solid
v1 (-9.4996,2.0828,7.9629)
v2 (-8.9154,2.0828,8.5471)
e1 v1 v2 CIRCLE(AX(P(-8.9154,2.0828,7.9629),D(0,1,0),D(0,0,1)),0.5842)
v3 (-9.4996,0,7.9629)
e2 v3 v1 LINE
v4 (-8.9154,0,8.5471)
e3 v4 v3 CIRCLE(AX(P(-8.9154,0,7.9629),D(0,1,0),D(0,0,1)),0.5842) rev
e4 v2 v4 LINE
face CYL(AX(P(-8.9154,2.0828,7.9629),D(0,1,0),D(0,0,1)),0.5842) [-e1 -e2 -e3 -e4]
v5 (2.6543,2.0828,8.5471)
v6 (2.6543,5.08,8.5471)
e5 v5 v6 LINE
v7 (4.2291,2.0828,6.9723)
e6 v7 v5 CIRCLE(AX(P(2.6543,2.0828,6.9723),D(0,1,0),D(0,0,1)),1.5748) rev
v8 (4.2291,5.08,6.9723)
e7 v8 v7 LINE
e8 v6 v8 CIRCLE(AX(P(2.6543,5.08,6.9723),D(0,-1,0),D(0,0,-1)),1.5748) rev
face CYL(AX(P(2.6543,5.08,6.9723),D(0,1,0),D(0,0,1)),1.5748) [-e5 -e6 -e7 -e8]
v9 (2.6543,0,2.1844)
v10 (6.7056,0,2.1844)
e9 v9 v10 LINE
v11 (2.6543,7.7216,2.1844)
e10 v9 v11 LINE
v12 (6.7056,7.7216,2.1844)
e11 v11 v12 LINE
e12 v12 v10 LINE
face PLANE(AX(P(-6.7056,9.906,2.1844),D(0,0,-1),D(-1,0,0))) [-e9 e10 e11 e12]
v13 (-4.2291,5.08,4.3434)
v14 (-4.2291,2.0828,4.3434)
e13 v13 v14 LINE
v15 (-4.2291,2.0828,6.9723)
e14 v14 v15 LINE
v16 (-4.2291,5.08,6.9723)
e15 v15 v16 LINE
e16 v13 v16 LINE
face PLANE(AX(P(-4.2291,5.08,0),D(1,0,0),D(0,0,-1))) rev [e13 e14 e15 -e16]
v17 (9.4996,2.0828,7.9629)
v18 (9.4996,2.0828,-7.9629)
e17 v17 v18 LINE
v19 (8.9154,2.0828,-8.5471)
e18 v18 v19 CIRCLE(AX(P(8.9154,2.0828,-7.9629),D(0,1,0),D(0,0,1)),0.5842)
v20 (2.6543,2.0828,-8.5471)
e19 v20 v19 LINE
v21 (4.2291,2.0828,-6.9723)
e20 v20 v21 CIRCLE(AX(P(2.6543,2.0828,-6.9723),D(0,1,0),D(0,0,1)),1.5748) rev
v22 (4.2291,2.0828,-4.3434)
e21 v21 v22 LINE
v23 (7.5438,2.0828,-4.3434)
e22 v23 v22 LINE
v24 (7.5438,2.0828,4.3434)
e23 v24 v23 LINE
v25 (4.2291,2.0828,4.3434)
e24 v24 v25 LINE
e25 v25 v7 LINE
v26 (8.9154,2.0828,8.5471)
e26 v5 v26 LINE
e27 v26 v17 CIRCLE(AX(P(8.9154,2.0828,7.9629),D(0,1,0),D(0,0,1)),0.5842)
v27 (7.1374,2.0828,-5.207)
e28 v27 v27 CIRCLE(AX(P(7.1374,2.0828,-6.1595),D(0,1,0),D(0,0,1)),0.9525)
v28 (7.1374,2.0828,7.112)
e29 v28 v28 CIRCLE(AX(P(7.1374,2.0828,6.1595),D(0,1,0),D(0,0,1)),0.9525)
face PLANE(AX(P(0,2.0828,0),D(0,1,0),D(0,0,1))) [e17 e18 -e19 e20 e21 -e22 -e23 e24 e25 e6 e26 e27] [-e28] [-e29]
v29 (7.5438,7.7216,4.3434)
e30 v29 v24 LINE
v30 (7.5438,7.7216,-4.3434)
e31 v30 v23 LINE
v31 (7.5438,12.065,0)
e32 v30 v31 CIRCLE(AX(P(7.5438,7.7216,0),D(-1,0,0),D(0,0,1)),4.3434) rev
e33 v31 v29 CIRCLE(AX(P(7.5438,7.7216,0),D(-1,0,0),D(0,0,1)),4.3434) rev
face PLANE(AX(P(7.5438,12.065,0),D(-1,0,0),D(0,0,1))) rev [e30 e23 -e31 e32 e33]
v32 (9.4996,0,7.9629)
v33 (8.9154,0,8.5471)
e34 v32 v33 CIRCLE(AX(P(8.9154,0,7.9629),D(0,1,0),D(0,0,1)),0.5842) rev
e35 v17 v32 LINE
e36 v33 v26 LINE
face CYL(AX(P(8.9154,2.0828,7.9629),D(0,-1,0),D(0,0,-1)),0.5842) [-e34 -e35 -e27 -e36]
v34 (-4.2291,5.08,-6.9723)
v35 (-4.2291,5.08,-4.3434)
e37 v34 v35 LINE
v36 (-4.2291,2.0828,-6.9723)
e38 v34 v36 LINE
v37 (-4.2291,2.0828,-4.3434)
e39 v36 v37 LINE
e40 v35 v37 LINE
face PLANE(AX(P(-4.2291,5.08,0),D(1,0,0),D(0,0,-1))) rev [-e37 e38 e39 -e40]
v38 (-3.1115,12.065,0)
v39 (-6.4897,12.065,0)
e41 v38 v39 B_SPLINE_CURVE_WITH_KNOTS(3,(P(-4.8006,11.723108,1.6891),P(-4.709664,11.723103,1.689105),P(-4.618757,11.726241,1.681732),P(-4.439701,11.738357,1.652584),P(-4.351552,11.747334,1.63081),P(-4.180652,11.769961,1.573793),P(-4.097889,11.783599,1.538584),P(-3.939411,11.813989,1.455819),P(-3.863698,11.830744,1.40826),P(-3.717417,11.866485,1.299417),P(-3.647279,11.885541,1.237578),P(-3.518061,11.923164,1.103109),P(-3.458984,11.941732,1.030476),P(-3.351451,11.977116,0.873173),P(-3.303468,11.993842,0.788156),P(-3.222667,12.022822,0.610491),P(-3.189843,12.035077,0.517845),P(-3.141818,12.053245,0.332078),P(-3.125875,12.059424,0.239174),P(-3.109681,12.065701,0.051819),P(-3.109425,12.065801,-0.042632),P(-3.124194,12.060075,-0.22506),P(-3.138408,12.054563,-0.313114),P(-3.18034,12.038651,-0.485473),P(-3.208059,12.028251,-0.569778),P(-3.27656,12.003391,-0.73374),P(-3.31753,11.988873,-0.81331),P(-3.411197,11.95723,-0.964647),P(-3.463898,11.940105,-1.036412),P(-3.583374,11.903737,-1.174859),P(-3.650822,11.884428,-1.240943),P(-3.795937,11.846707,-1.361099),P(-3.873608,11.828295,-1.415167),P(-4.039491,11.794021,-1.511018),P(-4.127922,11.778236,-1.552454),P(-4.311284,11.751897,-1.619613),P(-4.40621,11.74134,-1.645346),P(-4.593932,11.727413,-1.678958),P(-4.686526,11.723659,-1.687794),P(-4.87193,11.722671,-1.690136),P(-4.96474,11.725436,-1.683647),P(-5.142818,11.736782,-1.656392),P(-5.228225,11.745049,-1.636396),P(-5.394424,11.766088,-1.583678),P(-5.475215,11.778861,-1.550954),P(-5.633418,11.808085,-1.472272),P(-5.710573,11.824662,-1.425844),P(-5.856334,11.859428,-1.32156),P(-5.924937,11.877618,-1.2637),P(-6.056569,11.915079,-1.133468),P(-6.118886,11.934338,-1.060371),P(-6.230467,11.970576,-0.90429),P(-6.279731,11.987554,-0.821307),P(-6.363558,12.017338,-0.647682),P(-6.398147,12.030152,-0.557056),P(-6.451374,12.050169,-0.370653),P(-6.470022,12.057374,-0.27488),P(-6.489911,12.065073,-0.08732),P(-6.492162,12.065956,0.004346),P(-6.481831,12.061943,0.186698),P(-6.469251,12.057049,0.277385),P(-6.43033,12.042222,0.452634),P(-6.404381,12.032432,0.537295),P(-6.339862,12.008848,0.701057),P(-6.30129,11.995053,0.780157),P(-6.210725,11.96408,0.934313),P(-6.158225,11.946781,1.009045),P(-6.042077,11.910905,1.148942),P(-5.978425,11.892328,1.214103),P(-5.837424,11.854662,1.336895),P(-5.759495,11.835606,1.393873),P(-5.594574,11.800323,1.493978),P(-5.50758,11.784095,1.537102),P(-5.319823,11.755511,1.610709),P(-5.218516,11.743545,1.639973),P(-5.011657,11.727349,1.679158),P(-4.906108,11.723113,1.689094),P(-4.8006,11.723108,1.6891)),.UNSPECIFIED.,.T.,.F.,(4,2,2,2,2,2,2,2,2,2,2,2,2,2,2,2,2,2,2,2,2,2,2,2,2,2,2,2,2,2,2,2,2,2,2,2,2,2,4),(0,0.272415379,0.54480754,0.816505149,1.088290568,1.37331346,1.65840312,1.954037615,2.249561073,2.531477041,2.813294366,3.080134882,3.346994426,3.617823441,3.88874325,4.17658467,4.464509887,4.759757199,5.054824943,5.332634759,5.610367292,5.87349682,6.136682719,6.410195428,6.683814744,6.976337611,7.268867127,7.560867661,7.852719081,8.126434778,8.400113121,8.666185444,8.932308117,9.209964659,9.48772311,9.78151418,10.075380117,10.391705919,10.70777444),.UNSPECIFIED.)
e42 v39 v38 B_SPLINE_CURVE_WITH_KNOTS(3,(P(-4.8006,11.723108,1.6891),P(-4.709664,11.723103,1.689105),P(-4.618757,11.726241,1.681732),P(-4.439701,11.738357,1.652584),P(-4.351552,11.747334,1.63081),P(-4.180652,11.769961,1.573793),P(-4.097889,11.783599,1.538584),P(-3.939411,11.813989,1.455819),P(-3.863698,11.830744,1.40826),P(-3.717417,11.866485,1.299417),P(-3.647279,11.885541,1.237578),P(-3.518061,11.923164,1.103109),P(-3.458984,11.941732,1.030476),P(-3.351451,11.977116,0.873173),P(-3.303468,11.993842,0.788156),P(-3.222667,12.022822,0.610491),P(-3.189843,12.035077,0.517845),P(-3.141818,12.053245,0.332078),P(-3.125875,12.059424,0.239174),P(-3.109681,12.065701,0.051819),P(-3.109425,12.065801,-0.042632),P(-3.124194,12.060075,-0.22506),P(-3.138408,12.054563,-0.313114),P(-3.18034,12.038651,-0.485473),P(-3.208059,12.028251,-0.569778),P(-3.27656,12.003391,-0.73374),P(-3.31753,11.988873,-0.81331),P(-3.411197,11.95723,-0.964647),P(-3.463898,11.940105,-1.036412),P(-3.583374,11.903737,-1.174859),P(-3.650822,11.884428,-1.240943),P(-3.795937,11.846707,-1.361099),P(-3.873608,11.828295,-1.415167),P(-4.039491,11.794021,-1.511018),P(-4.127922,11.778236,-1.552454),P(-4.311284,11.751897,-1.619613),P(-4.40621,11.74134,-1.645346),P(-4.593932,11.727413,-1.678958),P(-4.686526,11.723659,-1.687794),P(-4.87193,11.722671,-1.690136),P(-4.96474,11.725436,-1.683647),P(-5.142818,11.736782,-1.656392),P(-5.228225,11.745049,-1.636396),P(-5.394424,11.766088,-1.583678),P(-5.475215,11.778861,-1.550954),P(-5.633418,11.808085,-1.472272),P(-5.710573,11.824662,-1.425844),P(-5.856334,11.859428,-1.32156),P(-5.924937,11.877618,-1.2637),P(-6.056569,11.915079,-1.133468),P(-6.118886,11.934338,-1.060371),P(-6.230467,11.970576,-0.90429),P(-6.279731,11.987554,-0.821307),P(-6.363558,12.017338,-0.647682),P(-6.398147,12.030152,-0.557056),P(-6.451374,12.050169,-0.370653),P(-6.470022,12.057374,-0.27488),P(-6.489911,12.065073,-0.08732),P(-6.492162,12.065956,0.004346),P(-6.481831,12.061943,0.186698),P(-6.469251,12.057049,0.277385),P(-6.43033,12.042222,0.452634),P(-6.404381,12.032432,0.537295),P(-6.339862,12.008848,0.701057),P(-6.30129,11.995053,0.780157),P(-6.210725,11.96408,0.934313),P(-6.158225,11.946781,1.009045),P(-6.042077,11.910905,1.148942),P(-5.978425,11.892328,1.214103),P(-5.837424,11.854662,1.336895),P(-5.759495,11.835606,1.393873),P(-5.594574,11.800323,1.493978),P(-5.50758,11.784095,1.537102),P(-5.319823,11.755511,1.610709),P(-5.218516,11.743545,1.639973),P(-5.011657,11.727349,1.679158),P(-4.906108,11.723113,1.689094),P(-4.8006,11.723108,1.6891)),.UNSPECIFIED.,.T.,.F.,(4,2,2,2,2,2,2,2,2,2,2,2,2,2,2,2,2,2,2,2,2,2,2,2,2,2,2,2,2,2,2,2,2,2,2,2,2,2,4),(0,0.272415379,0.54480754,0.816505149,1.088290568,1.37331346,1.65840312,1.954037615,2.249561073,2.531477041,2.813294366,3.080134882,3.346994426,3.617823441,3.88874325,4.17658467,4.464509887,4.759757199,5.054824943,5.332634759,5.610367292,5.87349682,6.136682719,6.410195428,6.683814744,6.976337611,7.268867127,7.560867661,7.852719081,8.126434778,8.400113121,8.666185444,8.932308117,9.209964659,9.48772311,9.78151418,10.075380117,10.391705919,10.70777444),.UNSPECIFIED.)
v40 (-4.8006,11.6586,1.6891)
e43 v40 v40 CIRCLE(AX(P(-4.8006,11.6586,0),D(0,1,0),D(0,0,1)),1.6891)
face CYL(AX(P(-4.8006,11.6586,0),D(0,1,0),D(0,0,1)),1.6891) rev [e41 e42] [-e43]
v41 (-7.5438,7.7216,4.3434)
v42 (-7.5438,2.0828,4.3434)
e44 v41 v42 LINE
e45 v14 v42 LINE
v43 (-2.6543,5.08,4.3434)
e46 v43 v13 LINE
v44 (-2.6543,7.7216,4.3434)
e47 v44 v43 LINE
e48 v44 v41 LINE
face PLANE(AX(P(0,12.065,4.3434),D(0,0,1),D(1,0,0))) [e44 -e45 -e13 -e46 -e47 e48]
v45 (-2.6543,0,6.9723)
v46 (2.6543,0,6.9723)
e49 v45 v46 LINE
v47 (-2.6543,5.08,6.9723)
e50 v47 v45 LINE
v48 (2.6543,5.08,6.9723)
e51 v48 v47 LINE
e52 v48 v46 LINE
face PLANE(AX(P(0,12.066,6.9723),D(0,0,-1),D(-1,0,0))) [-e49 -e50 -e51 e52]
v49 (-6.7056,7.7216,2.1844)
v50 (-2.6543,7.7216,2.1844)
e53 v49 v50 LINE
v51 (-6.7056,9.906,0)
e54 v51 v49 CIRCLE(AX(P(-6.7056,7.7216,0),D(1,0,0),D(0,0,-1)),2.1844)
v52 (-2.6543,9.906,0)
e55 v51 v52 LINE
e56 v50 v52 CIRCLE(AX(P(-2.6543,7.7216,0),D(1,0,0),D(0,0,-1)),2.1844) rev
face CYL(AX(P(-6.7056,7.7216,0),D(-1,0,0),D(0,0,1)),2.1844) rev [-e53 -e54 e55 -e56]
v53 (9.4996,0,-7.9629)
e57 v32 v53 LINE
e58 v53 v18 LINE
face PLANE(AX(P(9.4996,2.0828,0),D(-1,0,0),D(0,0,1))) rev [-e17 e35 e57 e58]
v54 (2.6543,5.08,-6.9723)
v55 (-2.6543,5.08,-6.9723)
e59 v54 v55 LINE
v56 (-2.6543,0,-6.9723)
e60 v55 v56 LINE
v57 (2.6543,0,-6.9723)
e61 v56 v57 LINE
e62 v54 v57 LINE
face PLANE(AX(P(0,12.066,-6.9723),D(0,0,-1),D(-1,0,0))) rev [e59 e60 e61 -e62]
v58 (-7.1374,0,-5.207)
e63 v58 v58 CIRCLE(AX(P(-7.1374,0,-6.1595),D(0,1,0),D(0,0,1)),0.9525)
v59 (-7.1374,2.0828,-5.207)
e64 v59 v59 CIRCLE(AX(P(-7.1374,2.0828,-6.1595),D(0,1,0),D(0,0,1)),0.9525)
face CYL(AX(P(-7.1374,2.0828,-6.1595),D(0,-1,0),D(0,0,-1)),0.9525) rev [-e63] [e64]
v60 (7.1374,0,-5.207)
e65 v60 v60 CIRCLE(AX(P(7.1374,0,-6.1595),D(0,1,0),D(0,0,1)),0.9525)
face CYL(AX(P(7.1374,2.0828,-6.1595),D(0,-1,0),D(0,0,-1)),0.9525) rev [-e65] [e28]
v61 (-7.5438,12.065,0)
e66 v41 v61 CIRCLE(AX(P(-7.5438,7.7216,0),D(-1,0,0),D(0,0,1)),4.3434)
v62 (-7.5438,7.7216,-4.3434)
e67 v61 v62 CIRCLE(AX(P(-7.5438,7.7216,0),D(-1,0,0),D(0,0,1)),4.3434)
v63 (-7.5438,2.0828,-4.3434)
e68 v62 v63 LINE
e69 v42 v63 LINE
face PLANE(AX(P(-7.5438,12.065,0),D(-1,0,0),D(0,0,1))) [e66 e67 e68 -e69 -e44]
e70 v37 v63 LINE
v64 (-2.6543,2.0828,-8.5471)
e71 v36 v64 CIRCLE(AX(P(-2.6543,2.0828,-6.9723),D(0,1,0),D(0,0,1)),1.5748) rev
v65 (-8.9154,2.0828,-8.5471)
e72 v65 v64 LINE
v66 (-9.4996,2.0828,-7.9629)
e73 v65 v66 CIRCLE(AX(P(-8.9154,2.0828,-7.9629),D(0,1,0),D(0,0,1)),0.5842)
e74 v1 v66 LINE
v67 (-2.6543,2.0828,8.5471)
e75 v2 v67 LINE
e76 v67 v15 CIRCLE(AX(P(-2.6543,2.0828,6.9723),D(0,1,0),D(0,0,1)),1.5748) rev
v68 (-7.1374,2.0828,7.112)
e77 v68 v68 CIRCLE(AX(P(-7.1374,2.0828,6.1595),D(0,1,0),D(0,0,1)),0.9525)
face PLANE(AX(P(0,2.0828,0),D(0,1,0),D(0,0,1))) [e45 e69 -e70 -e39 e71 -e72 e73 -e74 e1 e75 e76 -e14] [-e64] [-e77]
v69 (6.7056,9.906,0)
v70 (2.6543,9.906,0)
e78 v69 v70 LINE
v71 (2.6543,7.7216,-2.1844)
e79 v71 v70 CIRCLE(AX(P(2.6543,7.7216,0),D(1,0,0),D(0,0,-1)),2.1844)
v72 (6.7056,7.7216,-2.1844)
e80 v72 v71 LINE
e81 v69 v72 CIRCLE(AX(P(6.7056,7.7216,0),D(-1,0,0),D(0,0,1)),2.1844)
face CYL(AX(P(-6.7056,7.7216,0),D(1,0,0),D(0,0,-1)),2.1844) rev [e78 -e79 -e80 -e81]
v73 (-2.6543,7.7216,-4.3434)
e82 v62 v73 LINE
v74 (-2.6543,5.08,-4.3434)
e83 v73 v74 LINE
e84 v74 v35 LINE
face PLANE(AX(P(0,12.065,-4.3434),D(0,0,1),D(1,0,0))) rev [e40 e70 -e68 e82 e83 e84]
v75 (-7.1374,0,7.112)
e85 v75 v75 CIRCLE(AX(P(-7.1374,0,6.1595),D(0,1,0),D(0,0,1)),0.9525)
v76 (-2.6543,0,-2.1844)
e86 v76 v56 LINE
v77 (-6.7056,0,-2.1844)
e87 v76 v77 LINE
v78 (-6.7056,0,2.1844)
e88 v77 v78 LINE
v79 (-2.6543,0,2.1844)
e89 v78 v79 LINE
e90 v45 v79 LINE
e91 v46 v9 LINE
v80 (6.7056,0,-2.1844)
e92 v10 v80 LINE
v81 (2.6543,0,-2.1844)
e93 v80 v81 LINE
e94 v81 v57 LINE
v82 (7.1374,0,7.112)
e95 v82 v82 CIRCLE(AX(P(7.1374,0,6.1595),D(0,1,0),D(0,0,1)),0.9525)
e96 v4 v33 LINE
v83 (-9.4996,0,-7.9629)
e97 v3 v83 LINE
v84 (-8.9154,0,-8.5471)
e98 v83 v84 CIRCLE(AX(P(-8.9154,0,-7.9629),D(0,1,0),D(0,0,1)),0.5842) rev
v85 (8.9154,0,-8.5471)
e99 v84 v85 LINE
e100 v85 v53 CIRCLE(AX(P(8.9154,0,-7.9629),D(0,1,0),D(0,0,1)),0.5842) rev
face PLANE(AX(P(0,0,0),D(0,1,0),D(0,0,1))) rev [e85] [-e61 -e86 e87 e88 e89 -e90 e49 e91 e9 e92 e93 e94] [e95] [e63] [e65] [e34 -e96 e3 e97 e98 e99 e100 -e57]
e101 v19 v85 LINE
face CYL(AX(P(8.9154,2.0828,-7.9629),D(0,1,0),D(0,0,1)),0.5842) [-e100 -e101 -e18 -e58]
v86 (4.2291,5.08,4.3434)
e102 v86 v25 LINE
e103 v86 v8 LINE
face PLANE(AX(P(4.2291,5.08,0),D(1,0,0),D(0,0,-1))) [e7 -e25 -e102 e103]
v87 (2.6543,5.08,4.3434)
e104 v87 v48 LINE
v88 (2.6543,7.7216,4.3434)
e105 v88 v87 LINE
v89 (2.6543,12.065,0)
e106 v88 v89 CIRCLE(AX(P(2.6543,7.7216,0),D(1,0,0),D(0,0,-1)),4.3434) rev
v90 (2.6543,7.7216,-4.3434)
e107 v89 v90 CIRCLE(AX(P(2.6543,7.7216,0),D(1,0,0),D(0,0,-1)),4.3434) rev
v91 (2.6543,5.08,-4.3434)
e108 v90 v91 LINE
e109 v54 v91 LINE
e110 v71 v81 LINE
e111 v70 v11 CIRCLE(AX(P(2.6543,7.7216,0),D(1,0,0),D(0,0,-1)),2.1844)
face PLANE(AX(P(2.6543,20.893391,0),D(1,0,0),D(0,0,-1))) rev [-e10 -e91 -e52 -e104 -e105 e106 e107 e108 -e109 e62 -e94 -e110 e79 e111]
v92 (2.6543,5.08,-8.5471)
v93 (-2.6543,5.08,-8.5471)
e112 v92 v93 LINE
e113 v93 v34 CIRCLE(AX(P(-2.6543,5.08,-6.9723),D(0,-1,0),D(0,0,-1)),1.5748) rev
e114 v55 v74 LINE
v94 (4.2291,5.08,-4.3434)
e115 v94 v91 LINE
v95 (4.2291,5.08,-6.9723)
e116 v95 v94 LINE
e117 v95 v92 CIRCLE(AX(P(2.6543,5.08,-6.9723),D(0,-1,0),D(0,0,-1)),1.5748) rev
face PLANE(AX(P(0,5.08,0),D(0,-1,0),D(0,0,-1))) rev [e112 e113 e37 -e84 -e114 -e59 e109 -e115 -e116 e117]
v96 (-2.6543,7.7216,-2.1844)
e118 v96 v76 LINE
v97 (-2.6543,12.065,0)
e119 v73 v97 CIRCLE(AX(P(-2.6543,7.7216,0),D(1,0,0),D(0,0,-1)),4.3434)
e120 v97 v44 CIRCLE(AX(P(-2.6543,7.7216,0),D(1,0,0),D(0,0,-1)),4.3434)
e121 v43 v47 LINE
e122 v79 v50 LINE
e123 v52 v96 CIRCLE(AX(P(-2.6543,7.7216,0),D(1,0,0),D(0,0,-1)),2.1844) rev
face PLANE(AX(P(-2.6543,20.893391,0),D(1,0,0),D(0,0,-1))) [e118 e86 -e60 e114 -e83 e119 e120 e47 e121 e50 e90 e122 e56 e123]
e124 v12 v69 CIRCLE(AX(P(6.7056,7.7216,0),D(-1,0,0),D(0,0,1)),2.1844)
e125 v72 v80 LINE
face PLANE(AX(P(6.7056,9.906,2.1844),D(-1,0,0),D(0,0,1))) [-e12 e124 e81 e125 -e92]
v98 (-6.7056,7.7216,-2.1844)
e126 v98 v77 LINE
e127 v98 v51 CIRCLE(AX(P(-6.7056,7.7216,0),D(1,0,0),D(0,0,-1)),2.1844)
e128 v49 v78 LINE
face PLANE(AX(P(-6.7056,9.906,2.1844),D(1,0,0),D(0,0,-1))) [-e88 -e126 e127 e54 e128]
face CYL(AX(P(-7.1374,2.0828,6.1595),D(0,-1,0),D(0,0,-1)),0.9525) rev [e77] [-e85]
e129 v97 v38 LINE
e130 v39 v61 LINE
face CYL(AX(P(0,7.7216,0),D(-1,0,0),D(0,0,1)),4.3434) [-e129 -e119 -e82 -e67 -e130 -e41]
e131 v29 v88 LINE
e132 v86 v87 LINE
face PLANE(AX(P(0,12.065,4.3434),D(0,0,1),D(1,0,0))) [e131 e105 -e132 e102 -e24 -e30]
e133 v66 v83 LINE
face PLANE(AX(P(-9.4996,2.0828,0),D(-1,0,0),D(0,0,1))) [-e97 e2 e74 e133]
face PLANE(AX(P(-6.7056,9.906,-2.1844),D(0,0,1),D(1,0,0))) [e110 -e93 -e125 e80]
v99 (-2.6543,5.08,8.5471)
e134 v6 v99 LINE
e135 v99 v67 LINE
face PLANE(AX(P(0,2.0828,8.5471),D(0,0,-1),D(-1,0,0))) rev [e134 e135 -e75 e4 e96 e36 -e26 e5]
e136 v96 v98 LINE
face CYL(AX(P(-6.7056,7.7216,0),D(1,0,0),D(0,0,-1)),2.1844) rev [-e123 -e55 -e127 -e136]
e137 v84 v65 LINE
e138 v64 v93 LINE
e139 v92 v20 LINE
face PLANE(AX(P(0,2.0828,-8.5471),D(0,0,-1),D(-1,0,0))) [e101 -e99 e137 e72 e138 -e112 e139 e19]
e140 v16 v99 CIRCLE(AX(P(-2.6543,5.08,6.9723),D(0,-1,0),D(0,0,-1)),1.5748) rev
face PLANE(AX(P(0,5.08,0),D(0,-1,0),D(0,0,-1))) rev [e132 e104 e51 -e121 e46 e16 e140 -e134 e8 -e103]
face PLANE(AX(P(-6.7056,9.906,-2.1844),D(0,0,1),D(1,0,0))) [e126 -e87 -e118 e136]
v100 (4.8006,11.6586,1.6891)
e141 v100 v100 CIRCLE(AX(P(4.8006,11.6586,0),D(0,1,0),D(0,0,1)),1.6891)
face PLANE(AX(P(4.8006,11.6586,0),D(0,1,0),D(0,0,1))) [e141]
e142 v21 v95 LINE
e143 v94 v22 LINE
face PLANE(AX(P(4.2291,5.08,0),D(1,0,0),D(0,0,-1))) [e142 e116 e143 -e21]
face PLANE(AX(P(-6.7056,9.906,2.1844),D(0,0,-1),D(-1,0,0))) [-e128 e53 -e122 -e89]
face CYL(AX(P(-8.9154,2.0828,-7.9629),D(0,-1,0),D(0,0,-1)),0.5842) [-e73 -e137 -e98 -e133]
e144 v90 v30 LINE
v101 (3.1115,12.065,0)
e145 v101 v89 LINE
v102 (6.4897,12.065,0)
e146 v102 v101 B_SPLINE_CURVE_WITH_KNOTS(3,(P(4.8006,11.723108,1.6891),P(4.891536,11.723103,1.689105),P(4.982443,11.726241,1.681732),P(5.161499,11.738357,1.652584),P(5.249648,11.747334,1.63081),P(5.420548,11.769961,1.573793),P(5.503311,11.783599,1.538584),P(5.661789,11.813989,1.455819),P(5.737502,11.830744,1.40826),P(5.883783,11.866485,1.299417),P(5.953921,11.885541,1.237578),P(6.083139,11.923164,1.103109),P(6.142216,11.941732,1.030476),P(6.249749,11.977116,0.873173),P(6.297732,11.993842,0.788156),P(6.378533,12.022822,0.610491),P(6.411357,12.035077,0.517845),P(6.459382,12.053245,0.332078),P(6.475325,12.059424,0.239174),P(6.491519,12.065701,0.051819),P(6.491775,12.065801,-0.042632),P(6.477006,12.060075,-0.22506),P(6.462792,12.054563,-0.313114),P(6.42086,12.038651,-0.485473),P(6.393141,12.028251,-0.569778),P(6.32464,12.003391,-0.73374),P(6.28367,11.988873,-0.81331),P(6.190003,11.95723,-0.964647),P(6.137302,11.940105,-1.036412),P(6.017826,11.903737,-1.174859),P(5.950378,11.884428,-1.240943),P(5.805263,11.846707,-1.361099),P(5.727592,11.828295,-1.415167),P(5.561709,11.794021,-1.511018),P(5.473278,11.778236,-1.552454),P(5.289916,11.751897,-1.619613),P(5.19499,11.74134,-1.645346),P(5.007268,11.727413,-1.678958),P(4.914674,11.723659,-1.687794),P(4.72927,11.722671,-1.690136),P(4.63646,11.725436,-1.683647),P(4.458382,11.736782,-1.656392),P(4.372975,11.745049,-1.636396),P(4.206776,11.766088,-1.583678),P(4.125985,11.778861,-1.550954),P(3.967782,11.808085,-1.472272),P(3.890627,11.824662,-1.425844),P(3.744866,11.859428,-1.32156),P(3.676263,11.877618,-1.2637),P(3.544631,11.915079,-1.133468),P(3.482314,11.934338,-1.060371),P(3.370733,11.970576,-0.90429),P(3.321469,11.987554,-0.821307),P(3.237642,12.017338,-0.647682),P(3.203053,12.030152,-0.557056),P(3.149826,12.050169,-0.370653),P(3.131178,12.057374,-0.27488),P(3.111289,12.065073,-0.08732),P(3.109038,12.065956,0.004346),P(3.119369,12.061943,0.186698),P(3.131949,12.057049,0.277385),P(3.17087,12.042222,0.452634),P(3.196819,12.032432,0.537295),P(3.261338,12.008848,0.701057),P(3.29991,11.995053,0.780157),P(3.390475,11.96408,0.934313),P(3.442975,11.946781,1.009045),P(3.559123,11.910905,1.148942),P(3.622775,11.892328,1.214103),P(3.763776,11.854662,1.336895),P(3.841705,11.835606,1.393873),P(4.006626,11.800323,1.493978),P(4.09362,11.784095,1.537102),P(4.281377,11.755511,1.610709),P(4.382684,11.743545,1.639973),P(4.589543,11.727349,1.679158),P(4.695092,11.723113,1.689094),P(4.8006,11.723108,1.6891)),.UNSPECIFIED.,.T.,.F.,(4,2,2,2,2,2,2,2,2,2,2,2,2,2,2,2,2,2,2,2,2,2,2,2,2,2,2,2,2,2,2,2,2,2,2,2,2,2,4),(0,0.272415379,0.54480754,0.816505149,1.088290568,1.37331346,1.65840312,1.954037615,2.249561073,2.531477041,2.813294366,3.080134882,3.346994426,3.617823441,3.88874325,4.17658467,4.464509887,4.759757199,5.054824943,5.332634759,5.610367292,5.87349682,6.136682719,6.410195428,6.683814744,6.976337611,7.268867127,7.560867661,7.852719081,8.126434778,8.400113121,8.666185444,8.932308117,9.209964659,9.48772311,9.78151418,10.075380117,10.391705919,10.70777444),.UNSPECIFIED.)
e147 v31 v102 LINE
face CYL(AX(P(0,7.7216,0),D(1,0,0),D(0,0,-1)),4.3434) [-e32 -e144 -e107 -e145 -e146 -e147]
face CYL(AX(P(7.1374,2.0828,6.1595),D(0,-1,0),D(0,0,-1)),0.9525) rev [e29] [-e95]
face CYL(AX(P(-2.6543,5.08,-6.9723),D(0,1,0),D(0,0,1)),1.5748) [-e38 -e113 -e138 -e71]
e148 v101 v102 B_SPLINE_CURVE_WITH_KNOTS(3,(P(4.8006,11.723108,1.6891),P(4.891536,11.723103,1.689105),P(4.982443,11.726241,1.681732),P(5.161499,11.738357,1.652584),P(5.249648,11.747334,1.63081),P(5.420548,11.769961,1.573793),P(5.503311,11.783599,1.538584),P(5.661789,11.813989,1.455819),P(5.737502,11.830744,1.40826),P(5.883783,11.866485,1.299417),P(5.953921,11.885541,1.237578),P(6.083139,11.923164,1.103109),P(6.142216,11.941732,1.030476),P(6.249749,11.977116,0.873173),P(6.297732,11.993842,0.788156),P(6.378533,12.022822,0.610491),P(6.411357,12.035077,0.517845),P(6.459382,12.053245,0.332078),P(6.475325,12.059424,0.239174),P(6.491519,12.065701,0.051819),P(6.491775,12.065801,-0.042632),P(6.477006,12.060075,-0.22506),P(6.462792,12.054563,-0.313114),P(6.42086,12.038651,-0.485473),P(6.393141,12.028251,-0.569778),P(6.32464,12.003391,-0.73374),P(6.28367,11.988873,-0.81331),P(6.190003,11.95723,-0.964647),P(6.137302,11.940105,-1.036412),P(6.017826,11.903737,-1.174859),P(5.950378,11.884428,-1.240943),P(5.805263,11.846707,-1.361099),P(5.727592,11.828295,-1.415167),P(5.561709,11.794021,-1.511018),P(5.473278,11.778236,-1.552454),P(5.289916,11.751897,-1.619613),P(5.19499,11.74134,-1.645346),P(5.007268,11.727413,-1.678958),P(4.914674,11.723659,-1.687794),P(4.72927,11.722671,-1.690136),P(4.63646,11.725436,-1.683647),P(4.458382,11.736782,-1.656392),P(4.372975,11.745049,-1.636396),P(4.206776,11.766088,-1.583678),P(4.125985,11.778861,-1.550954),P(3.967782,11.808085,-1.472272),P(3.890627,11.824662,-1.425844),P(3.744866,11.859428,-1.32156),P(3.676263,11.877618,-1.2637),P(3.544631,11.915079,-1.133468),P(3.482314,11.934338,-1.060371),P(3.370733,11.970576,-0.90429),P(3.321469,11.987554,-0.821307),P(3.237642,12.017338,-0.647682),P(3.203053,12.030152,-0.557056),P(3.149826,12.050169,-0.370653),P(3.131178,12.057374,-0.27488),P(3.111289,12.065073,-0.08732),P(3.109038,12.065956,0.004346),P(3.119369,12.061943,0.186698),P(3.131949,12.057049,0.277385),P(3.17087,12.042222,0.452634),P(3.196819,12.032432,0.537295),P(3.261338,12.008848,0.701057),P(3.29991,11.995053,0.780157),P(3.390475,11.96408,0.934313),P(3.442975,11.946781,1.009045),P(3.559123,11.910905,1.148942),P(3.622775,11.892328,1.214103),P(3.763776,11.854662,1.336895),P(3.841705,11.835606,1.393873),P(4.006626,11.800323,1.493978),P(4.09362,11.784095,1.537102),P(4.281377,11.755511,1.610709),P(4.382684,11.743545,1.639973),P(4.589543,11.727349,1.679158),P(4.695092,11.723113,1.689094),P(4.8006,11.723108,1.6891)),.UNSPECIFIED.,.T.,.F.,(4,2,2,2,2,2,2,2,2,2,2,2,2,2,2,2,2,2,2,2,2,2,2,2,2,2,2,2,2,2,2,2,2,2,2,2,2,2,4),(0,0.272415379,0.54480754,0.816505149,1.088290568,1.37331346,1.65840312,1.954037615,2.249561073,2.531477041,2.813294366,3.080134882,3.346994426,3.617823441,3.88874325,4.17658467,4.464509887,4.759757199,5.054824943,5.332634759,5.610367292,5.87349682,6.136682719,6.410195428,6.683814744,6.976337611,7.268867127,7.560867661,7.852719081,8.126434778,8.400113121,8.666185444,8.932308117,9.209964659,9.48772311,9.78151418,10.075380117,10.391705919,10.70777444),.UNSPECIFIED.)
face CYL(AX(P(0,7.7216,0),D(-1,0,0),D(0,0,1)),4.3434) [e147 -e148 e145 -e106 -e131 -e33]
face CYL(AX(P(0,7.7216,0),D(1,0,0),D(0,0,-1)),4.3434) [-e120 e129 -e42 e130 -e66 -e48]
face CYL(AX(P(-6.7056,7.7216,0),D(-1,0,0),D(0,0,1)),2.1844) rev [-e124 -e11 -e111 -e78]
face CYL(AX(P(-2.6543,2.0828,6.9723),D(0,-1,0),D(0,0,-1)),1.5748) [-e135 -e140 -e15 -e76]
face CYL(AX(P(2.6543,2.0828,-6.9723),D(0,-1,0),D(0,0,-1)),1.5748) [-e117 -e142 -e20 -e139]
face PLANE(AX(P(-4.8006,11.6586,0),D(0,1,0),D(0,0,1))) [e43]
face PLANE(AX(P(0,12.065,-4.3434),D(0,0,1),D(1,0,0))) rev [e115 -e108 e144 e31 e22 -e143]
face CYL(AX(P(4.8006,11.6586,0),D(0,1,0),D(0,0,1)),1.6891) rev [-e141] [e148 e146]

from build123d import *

# Parameters (mm, degrees)
SKETCH2_W           = 18.9992
SKETCH2_H           = 17.0942
SKETCH2_R           = 0.9525
BOSS_EXTRUDE1_DEPTH = 2.0828
BOSS_EXTRUDE2_START = 2.0828
SKETCH2_3_W         = 1.5748
SKETCH2_3_H         = 8.6868
SKETCH2_3_W_2       = 5.3086
SKETCH2_3_H_2       = 2.6289
BOSS_EXTRUDE2_DEPTH = 2.9972
BOSS_EXTRUDE3_START = 2.0828
SKETCH2_4_W         = 3.3147
SKETCH2_4_H         = 8.6868
BOSS_EXTRUDE3_DEPTH = 9.9822
BOSS_EXTRUDE4_START = 2.0828
SKETCH2_6_W         = 1.5748
SKETCH2_6_H         = 8.6868
BOSS_EXTRUDE4_DEPTH = 9.9822
CUT_EXTRUDE1_REACH  = 19.574
SKETCH2_5_W         = 5.3086
SKETCH2_5_H         = 2.6289
SKETCH2_5_H_2       = 8.6868
SKETCH4_W           = 13.4112
SKETCH4_H           = 4.3688
CUT_EXTRUDE2_DEPTH  = 9.906
FILLET1_R           = 2.1844
FILLET2_R           = 4.3434
FILLET3_R           = 1.5748
FILLET4_R           = 0.5842
SKETCH6_R           = 1.6891
CUT_EXTRUDE3_DEPTH  = 0.4064


with BuildPart() as part:
    # Sketch2 → Boss-Extrude1 (new body)
    with BuildSketch(Plane(origin=(0, 0, 0), x_dir=(1, 0, 0), z_dir=(0, 1, 0))):
        Rectangle(SKETCH2_W, SKETCH2_H)
        with Locations(Location((-7.1374, -6.1595, 0), (0, 0, 270))):
            Circle(SKETCH2_R, mode=Mode.SUBTRACT)
        with Locations(Location((-7.1374, 6.1595, 0), (0, 0, 270))):
            Circle(SKETCH2_R, mode=Mode.SUBTRACT)
        with Locations(Location((7.1374, 6.1595, 0), (0, 0, 270))):
            Circle(SKETCH2_R, mode=Mode.SUBTRACT)
        with Locations(Location((7.1374, -6.1595, 0), (0, 0, 270))):
            Circle(SKETCH2_R, mode=Mode.SUBTRACT)
    extrude(amount=BOSS_EXTRUDE1_DEPTH)

    # Sketch2<3> → Boss-Extrude2 (add)
    with BuildSketch(Plane(origin=(0, 0, 0), x_dir=(1, 0, 0), z_dir=(0, 1, 0)).offset(BOSS_EXTRUDE2_START)):
        Polygon((4.2291, 8.5471), (-4.2291, 8.5471), (-4.2291, 4.3434), (-2.6543, 4.3434), (-2.6543, 6.9723), (2.6543, 6.9723), (2.6543, 4.3434), (4.2291, 4.3434), align=None)
        with Locations((-3.4417, 0)):
            Rectangle(SKETCH2_3_W, SKETCH2_3_H)
        with Locations((3.4417, 0)):
            Rectangle(SKETCH2_3_W, SKETCH2_3_H)
        Polygon((-4.2291, -4.3434), (-4.2291, -8.5471), (4.2291, -8.5471), (4.2291, -4.3434), (2.6543, -4.3434), (2.6543, -6.9723), (-2.6543, -6.9723), (-2.6543, -4.3434), align=None)
        with Locations((0, 5.65785)):
            Rectangle(SKETCH2_3_W_2, SKETCH2_3_H_2)
        Rectangle(SKETCH2_3_W_2, SKETCH2_3_H)
        with Locations((0, -5.65785)):
            Rectangle(SKETCH2_3_W_2, SKETCH2_3_H_2)
    extrude(amount=BOSS_EXTRUDE2_DEPTH)

    # Sketch2<4> → Boss-Extrude3 (add)
    with BuildSketch(Plane(origin=(0, 0, 0), x_dir=(1, 0, 0), z_dir=(0, 1, 0)).offset(BOSS_EXTRUDE3_START)):
        with Locations((5.88645, 0)):
            Rectangle(SKETCH2_4_W, SKETCH2_4_H)
        with Locations((-5.88645, 0)):
            Rectangle(SKETCH2_4_W, SKETCH2_4_H)
    extrude(amount=BOSS_EXTRUDE3_DEPTH)

    # Sketch2<6> → Boss-Extrude4 (add)
    with BuildSketch(Plane(origin=(0, 0, 0), x_dir=(1, 0, 0), z_dir=(0, 1, 0)).offset(BOSS_EXTRUDE4_START)):
        with Locations((-3.4417, 0)):
            Rectangle(SKETCH2_6_W, SKETCH2_6_H)
        with Locations((3.4417, 0)):
            Rectangle(SKETCH2_6_W, SKETCH2_6_H)
    extrude(amount=BOSS_EXTRUDE4_DEPTH)

    # Sketch2<5> → Cut-Extrude1 (cut, up to next)
    with BuildSketch(Plane(origin=(0, 0, 0), x_dir=(1, 0, 0), z_dir=(0, 1, 0)), mode=Mode.PRIVATE) as cut_extrude1_sk1:
        with Locations((0, 5.65785)):
            Rectangle(SKETCH2_5_W, SKETCH2_5_H)
    cut_extrude1_tool1 = extrude(cut_extrude1_sk1.sketch, amount=CUT_EXTRUDE1_REACH, mode=Mode.PRIVATE) & part.part
    # Sketch2<5> → Cut-Extrude1 (cut, up to next)
    with BuildSketch(Plane(origin=(0, 0, 0), x_dir=(1, 0, 0), z_dir=(0, 1, 0)), mode=Mode.PRIVATE) as cut_extrude1_sk2:
        Rectangle(SKETCH2_5_W, SKETCH2_5_H_2)
    cut_extrude1_tool2 = extrude(cut_extrude1_sk2.sketch, amount=CUT_EXTRUDE1_REACH, mode=Mode.PRIVATE) & part.part
    # Sketch2<5> → Cut-Extrude1 (cut, up to next)
    with BuildSketch(Plane(origin=(0, 0, 0), x_dir=(1, 0, 0), z_dir=(0, 1, 0)), mode=Mode.PRIVATE) as cut_extrude1_sk3:
        with Locations((0, -5.65785)):
            Rectangle(SKETCH2_5_W, SKETCH2_5_H)
    cut_extrude1_tool3 = extrude(cut_extrude1_sk3.sketch, amount=CUT_EXTRUDE1_REACH, mode=Mode.PRIVATE) & part.part
    add(cut_extrude1_tool1.solids().sort_by_distance((0, 0, -5.65785))[0], mode=Mode.SUBTRACT)
    add(cut_extrude1_tool2.solids().sort_by_distance((0, 0, 0))[0], mode=Mode.SUBTRACT)
    add(cut_extrude1_tool3.solids().sort_by_distance((0, 0, 5.65785))[0], mode=Mode.SUBTRACT)

    # Sketch4 → Cut-Extrude2 (cut)
    with BuildSketch(Plane(origin=(0, 0, 0), x_dir=(1, 0, 0), z_dir=(0, 1, 0))):
        Rectangle(SKETCH4_W, SKETCH4_H)
    extrude(amount=CUT_EXTRUDE2_DEPTH, mode=Mode.SUBTRACT)

    # Fillet1
    fillet1_edges = [part.edges().sort_by_distance(p)[0] for p in [
        (4.67995, 9.906, -2.1844),
        (4.67995, 9.906, 2.1844),
        (-4.67995, 9.906, 2.1844),
        (-4.67995, 9.906, -2.1844),
    ]]
    fillet(fillet1_edges, radius=FILLET1_R - 0.0001)  # a hair under: the kernel refuses the full size

    # Fillet2
    fillet2_edges = [part.edges().sort_by_distance(p)[0] for p in [
        (-5.09905, 12.065, 4.3434),
        (-5.09905, 12.065, -4.3434),
        (5.09905, 12.065, 4.3434),
        (5.09905, 12.065, -4.3434),
    ]]
    fillet(fillet2_edges, radius=FILLET2_R - 0.0001)  # a hair under: the kernel refuses the full size

    # Fillet3
    fillet3_edges = [part.edges().sort_by_distance(p)[0] for p in [
        (4.2291, 3.5814, 8.5471),
        (4.2291, 3.5814, -8.5471),
        (-4.2291, 3.5814, -8.5471),
        (-4.2291, 3.5814, 8.5471),
    ]]
    fillet(fillet3_edges, radius=FILLET3_R)

    # Fillet4
    fillet4_edges = [part.edges().sort_by_distance(p)[0] for p in [
        (9.4996, 1.0414, 8.5471),
        (-9.4996, 1.0414, 8.5471),
        (-9.4996, 1.0414, -8.5471),
        (9.4996, 1.0414, -8.5471),
    ]]
    fillet(fillet4_edges, radius=FILLET4_R)

    # Sketch6 → Cut-Extrude3 (cut)
    with BuildSketch(Plane(origin=(0, 12.065, 0), x_dir=(1, 0, 0), z_dir=(0, 1, 0))):
        with Locations(Location((4.8006, 0, 0), (0, 0, 270))):
            Circle(SKETCH6_R)
        with Locations(Location((-4.8006, 0, 0), (0, 0, 270))):
            Circle(SKETCH6_R)
    extrude(amount=-CUT_EXTRUDE3_DEPTH, mode=Mode.SUBTRACT)


solid = part.part
